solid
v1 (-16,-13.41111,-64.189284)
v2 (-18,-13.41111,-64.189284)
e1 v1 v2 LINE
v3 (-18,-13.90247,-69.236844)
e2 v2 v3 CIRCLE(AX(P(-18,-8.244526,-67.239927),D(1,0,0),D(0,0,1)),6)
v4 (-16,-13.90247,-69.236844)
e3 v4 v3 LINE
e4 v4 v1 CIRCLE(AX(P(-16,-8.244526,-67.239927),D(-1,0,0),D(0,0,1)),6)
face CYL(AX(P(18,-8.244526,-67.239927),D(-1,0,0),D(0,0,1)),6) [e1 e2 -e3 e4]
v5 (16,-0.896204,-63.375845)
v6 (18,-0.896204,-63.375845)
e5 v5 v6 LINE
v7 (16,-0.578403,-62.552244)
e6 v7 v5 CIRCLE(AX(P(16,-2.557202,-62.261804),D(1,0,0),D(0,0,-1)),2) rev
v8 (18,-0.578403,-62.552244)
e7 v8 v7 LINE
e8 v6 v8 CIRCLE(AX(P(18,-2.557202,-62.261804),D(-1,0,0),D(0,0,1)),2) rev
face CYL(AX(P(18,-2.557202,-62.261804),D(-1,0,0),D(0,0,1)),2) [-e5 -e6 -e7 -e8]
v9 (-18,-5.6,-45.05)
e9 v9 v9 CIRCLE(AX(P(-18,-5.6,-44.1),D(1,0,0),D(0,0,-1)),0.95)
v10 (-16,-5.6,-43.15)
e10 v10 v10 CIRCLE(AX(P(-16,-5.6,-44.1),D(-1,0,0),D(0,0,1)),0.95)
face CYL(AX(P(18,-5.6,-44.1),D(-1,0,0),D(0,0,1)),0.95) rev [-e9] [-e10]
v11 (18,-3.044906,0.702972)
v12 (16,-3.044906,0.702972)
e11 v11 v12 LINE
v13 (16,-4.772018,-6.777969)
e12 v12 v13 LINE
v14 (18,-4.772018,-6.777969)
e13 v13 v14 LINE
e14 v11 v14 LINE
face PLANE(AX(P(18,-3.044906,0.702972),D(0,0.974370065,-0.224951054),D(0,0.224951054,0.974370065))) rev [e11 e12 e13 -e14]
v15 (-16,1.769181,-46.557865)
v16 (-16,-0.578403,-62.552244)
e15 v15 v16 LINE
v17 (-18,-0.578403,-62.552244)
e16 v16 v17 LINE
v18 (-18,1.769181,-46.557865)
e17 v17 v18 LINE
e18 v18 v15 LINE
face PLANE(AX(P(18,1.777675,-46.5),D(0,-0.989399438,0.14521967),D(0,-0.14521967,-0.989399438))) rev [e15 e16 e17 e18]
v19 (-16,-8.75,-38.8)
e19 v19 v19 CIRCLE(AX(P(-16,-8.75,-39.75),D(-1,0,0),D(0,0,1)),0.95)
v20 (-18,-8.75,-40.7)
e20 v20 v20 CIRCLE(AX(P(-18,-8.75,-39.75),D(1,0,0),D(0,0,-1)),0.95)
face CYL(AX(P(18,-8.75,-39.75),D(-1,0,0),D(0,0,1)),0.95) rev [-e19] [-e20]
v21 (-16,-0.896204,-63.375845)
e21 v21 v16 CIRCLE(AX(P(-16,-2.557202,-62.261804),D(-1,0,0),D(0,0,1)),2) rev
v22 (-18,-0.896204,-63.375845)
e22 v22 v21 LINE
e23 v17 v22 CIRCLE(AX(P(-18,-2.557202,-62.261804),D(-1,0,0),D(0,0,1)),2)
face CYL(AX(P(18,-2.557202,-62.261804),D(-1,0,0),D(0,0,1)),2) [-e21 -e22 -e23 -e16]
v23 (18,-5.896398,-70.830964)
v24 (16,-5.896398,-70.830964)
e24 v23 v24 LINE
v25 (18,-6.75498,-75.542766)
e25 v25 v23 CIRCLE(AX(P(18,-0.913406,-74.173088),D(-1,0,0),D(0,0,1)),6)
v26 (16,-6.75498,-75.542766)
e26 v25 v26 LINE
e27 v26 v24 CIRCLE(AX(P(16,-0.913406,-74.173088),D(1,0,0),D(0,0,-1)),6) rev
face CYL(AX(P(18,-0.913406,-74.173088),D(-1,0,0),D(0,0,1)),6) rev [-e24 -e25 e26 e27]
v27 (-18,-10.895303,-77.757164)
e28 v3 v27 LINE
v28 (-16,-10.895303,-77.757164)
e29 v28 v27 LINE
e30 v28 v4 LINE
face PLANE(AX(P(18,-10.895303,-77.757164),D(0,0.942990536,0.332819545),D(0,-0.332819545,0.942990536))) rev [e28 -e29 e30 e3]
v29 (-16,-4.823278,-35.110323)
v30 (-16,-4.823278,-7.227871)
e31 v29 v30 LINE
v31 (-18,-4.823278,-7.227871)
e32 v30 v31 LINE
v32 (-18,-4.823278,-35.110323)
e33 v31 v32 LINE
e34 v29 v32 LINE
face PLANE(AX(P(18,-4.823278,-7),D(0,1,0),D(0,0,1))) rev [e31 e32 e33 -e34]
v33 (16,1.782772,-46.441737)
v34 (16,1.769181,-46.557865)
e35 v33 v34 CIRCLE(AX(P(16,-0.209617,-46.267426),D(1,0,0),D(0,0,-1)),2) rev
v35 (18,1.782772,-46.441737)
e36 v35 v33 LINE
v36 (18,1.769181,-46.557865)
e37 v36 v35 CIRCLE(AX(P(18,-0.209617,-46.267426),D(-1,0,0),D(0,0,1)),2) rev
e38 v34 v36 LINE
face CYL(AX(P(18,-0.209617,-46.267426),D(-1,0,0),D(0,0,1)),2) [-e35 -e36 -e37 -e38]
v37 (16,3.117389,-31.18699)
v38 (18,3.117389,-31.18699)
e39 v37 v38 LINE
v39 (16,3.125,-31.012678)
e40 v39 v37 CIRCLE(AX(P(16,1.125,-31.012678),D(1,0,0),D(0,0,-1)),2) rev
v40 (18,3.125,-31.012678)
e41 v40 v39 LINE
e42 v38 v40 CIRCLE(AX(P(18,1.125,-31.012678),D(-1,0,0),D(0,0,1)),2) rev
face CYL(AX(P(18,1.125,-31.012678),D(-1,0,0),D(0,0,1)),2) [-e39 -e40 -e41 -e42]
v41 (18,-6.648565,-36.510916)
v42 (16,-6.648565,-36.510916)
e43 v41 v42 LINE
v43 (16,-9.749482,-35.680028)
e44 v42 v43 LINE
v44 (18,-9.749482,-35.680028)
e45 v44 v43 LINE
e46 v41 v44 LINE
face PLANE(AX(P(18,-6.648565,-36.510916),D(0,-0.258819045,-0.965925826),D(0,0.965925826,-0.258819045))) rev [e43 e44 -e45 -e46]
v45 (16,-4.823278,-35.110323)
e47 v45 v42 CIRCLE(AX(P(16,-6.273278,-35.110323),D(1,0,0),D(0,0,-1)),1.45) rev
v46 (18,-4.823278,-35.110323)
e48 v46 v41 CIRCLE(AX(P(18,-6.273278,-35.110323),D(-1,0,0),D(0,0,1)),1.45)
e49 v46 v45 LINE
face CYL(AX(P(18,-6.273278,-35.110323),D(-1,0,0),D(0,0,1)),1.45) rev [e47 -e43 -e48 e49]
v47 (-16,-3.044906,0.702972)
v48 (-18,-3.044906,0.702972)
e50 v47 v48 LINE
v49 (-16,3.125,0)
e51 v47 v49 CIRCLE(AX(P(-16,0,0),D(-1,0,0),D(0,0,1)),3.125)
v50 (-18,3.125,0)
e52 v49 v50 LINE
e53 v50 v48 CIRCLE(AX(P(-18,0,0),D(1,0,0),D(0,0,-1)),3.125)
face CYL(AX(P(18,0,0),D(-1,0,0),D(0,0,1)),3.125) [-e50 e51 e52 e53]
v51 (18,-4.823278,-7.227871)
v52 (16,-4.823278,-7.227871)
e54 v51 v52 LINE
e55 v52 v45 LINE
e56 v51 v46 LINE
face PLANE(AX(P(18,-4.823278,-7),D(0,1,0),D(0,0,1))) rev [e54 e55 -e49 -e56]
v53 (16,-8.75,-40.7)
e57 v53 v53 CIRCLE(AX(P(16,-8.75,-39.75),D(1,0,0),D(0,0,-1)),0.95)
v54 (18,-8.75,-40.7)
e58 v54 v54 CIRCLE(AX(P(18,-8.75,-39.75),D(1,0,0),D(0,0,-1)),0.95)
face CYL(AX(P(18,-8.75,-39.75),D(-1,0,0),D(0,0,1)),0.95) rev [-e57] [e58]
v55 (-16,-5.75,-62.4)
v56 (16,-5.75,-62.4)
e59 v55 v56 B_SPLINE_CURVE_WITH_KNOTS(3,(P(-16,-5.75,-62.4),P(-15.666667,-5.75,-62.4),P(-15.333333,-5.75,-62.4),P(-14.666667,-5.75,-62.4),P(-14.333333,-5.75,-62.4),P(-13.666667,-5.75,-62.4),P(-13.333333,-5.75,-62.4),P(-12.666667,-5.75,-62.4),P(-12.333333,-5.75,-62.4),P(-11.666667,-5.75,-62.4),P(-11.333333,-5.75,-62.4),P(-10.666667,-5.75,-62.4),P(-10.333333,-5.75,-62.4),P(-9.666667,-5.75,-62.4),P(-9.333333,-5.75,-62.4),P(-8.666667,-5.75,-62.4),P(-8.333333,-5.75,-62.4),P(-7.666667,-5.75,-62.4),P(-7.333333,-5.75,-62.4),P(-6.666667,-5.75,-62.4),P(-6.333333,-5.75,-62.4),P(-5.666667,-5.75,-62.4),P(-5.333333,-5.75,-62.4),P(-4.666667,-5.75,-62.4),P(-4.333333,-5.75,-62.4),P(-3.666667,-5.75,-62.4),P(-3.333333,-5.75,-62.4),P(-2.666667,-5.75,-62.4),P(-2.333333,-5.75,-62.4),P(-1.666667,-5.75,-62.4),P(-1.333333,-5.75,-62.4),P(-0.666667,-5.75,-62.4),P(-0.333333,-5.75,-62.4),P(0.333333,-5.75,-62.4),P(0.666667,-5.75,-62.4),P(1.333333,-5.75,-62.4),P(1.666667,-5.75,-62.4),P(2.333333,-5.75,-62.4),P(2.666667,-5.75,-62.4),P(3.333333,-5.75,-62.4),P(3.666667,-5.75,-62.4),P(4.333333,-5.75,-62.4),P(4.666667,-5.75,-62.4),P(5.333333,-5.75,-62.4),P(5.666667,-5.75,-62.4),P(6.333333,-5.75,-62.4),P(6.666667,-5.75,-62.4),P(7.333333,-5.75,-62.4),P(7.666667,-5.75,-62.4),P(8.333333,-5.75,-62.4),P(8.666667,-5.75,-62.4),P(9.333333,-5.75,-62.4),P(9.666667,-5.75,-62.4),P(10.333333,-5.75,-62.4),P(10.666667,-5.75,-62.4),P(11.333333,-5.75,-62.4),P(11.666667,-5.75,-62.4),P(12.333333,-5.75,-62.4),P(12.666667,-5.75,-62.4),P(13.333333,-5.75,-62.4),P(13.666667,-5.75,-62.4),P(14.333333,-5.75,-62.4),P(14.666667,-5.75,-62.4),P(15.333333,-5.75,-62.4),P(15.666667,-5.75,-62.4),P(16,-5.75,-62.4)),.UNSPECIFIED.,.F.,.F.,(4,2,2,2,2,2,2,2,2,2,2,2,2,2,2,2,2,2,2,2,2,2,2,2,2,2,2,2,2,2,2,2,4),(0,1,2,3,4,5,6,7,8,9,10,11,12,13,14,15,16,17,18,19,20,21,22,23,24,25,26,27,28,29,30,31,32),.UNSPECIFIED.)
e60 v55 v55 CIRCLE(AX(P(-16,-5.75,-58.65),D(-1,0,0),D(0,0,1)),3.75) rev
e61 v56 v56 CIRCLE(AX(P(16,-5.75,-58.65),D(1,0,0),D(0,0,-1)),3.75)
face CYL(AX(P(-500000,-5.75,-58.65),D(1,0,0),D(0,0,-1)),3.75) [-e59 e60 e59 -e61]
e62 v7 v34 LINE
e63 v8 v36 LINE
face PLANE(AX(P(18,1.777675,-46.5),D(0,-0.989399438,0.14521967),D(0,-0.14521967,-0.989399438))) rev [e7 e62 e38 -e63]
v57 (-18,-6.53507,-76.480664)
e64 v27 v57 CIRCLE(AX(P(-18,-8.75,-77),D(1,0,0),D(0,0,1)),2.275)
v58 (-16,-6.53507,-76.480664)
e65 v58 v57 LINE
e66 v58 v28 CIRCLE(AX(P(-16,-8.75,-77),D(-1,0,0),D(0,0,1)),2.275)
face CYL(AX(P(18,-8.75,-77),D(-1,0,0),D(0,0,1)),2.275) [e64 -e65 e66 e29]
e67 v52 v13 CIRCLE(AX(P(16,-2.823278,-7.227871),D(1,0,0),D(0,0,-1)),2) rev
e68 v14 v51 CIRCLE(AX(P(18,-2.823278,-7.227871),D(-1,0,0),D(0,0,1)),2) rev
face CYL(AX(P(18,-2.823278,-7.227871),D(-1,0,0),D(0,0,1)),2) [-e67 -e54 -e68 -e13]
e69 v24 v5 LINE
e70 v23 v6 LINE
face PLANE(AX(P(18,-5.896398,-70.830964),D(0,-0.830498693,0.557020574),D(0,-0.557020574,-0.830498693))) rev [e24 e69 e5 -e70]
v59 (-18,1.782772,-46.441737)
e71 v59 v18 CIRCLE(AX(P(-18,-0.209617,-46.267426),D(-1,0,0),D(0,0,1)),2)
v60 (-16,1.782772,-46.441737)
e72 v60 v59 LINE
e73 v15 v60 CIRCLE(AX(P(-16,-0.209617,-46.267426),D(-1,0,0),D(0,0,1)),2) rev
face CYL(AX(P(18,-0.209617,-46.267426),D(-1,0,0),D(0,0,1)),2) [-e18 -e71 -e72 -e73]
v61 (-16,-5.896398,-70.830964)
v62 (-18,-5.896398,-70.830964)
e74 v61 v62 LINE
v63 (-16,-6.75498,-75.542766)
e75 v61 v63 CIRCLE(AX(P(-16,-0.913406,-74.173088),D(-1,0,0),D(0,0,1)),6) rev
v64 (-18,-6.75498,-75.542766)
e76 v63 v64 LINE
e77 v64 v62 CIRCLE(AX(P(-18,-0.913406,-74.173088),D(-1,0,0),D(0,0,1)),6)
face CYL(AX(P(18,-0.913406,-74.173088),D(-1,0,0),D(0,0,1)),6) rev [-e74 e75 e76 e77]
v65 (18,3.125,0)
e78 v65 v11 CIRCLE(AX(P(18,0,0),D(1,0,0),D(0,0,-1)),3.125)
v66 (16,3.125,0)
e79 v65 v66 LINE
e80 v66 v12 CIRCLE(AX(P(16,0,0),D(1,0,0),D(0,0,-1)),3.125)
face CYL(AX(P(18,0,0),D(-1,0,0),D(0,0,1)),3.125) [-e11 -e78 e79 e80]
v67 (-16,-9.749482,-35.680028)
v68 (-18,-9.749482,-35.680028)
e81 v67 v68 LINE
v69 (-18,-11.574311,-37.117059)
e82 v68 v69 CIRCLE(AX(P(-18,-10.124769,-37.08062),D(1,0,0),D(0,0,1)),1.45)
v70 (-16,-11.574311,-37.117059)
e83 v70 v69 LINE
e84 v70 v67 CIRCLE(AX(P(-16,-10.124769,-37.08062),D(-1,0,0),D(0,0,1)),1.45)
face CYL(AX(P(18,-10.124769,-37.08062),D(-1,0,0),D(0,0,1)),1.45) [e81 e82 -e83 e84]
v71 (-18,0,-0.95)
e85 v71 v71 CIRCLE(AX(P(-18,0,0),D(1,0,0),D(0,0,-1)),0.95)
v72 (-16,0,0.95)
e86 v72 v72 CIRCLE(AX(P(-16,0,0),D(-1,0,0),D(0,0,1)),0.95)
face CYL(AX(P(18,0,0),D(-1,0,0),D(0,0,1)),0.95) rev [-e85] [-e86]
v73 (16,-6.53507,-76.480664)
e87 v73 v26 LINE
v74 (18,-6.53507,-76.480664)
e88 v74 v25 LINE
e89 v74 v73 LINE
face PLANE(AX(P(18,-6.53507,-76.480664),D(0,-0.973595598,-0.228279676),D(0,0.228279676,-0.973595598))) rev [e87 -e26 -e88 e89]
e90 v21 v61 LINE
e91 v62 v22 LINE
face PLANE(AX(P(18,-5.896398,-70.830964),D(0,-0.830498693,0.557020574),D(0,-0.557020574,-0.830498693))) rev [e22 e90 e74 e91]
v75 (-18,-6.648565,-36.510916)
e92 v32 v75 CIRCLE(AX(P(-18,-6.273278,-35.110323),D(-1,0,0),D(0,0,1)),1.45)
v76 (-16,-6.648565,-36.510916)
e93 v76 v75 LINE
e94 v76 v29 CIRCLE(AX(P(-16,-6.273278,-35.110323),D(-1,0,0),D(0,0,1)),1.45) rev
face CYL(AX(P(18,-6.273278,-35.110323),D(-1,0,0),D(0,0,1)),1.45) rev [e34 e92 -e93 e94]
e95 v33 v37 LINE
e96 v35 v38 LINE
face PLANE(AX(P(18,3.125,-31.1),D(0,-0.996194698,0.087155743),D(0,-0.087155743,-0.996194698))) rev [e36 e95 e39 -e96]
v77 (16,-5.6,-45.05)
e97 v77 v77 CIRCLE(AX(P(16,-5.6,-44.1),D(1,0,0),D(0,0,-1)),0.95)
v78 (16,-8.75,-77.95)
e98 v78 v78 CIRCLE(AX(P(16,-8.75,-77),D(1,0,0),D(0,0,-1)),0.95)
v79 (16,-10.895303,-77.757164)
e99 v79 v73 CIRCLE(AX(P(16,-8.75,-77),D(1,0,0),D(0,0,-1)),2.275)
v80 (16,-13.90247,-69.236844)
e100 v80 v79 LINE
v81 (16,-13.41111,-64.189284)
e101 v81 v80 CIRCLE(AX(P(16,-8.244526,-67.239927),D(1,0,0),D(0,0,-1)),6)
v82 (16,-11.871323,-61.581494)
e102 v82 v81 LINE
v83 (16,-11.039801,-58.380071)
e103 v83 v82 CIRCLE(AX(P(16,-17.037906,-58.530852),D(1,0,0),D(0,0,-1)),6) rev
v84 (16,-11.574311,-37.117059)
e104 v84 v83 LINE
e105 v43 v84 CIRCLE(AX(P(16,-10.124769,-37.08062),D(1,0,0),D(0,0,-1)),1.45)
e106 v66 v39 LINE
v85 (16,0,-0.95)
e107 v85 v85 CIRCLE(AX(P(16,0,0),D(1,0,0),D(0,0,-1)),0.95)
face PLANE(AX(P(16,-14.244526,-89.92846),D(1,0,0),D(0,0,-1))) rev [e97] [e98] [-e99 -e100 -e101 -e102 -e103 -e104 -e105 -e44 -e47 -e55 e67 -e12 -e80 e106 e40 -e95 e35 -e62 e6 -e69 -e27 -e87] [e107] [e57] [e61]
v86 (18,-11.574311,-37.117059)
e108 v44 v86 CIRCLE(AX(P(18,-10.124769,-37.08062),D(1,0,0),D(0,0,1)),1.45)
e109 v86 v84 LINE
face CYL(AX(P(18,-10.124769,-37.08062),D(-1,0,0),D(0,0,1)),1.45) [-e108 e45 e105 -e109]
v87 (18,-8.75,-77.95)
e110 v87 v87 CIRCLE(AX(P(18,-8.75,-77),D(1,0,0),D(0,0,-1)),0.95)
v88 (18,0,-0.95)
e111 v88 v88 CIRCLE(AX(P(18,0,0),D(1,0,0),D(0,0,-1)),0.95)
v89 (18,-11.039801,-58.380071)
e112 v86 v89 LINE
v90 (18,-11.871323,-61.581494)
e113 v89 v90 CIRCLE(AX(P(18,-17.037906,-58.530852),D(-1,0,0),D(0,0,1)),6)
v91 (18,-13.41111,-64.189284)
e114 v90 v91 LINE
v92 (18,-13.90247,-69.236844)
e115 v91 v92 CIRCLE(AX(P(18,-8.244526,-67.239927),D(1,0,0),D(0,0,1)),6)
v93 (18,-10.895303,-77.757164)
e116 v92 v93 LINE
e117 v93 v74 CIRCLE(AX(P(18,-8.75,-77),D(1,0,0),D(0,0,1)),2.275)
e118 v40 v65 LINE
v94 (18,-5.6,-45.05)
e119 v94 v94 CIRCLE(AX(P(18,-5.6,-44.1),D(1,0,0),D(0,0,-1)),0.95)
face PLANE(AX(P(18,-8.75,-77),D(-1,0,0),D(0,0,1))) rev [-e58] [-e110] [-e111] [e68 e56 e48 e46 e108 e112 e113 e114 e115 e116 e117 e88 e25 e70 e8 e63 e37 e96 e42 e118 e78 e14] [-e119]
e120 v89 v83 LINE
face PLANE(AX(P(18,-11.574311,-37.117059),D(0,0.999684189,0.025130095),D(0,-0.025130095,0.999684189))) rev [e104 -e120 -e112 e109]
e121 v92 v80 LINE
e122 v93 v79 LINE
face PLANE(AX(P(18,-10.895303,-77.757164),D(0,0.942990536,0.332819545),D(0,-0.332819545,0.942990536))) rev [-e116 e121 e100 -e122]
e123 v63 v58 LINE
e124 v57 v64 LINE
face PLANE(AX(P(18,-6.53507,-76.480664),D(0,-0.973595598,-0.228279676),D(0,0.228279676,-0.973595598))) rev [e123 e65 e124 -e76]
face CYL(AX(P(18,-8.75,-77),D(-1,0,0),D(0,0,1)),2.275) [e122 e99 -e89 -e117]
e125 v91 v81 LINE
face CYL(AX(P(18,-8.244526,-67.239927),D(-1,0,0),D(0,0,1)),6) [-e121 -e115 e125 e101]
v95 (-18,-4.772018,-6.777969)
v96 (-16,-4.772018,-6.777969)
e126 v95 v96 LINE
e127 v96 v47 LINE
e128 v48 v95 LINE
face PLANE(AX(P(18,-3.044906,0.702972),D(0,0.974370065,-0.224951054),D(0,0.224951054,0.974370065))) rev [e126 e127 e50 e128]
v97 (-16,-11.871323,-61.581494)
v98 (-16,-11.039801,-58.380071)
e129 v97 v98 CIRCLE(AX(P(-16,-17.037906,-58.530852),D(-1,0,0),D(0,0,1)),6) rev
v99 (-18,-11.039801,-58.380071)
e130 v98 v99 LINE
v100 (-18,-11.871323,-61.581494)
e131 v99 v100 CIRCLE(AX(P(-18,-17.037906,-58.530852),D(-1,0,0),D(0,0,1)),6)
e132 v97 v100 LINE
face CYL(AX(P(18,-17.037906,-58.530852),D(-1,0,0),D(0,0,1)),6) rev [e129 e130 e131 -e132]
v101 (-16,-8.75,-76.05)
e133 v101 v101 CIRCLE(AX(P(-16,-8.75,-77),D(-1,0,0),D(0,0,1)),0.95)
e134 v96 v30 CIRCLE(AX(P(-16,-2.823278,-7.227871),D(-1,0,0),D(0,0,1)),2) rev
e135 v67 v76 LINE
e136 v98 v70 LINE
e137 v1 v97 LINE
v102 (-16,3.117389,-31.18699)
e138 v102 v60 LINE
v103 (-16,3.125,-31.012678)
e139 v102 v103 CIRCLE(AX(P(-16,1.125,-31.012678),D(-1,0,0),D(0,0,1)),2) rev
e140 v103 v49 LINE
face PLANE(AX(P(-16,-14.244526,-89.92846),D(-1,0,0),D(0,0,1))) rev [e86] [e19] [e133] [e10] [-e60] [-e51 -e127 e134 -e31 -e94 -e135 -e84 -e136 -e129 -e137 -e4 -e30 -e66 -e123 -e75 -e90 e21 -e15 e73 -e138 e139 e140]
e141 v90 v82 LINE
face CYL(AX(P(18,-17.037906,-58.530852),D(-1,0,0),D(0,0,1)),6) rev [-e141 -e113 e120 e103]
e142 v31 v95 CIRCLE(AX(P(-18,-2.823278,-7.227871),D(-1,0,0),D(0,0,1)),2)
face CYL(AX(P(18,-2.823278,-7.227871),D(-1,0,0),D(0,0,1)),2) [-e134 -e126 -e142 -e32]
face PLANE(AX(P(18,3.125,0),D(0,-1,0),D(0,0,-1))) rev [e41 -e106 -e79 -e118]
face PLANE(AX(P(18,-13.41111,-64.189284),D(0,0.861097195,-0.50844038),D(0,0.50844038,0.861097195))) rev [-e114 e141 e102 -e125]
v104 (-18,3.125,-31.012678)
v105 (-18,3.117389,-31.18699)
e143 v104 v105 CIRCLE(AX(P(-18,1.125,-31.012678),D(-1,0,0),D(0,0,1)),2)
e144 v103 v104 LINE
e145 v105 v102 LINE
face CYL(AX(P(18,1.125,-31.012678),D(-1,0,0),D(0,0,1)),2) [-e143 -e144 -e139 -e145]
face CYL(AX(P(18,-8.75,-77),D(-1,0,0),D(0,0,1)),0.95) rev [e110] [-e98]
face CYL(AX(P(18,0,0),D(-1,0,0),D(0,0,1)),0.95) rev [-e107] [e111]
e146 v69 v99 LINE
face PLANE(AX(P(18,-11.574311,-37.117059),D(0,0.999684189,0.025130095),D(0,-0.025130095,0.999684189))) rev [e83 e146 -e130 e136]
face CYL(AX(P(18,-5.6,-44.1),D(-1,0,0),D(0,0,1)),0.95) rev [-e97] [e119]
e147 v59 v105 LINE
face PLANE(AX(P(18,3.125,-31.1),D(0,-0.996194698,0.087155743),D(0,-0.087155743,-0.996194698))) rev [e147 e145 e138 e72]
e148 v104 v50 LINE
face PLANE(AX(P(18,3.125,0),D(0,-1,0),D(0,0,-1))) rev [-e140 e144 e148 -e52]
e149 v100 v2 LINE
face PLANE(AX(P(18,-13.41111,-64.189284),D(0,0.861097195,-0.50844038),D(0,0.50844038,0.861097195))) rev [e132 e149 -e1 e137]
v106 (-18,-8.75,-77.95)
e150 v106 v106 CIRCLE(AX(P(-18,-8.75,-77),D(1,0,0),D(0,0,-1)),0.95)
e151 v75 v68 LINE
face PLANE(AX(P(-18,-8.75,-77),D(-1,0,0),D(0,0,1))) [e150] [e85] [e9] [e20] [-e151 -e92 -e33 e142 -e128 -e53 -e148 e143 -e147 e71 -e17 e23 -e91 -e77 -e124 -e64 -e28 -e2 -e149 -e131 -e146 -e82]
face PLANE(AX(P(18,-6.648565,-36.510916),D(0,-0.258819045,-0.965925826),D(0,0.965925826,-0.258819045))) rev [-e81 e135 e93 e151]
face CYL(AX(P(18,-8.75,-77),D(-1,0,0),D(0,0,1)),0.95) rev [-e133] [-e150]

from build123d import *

# Parameters (mm, degrees)
SKETCH1_R                = 0.95
BOSS_EXTRUDE1_DEPTH      = 18
FILLET1_R                = 2
CUT_EXTRUDE1_DEPTH       = 83.531401045
CUT_EXTRUDE1_DEPTH_BACK  = 83.531401045
SKETCH2_W                = 32
SKETCH2_H                = 101.957647254
BOSS_EXTRUDE2_DEPTH      = 16
BOSS_EXTRUDE2_DEPTH_BACK = 18
SKETCH3_R                = 3.75


with BuildPart() as part:
    # Sketch1 → Boss-Extrude1 (new, symmetric)
    with BuildSketch(Plane(origin=(0, 0, 0), x_dir=(0, 0, -1), z_dir=(1, 0, 0))):
        with BuildLine():
            Line((0, 3.125), (31.1, 3.125))
            Line((31.1, 3.125), (46.5, 1.777674582))
            Line((46.5, 1.777674582), (63, -0.644122384))
            Line((63, -0.644122384), (70.830964262, -5.89639821))
            ThreePointArc((70.830964262, -5.89639821), (73.097482893, -6.816208289), (75.542765767, -6.754979641))
            Line((75.542765767, -6.754979641), (76.480663736, -6.535070013))
            ThreePointArc((76.480663736, -6.535070013), (79.183357394, -8.1108009), (77.757164464, -10.895303469))
            Line((77.757164464, -10.895303469), (69.23684377, -13.902469654))
            ThreePointArc((69.23684377, -13.902469654), (66.658598046, -14.216298138), (64.18928422, -13.41110961))
            Line((64.18928422, -13.41110961), (61.581493884, -11.871323024))
            ThreePointArc((61.581493884, -11.871323024), (60.039213852, -11.230596721), (58.380071029, -11.039801059))
            Line((58.380071029, -11.039801059), (37.117058695, -11.574311392))
            ThreePointArc((37.117058695, -11.574311392), (35.941440636, -11.021859195), (35.680027609, -9.749481703))
            Line((35.680027609, -9.749481703), (36.510915657, -6.64856529))
            ThreePointArc((36.510915657, -6.64856529), (36.260685553, -5.390573603), (35.110323209, -4.823277675))
            Line((35.110323209, -4.823277675), (7, -4.823277675))
            Line((7, -4.823277675), (-0.702972045, -3.044906452))
            ThreePointArc((-0.702972045, -3.044906452), (-3.104912049, 0.353760043), (0, 3.125))
        make_face()
        Circle(SKETCH1_R, mode=Mode.SUBTRACT)
        with Locations((77, -8.75)):
            Circle(SKETCH1_R, mode=Mode.SUBTRACT)
        with Locations((39.75, -8.75)):
            Circle(SKETCH1_R, mode=Mode.SUBTRACT)
        with Locations((44.1, -5.6)):
            Circle(SKETCH1_R, mode=Mode.SUBTRACT)
    extrude(amount=BOSS_EXTRUDE1_DEPTH, both=True)

    # Fillet1
    # the kernel refuses this fillet: 2 mm, written as the material it takes off along each edge
    with BuildSketch(Plane(origin=(18.569678042, -4.823277675, -7), x_dir=(0, 0, -1), z_dir=(-1, 0, 0))) as fillet1_piece_1:
        with BuildLine():
            CenterArc((FILLET1_R * 0.113935608302, -FILLET1_R), FILLET1_R, 90, 13)
            Line((-FILLET1_R * 0.111015446042, -FILLET1_R * 0.0256299352148), (0, 0))
            Line((0, 0), (FILLET1_R * 0.113935608302, 0))
        make_face()
    extrude(amount=37.139356083, mode=Mode.SUBTRACT)
    with BuildSketch(Plane(origin=(18.218304715, 3.125, -31.1), x_dir=(0, -0.08715574274766148, -0.9961946980917452), z_dir=(-1, 0, 0))) as fillet1_piece_2:
        with BuildLine():
            CenterArc((FILLET1_R * 0.0436609429085, FILLET1_R), FILLET1_R, 265, 5)
            Line((-FILLET1_R * 0.0434947998391, FILLET1_R * 0.00380530190825), (0, 0))
            Line((0, 0), (FILLET1_R * 0.0436609429085, 0))
        make_face()
    extrude(amount=36.436609429, mode=Mode.SUBTRACT)
    with BuildSketch(Plane(origin=(18.14621298, 1.777674582, -46.5), x_dir=(0, -0.1452196700772367, -0.9893994377513354), z_dir=(-1, 0, 0))) as fillet1_piece_3:
        with BuildLine():
            CenterArc((FILLET1_R * 0.0292425960983, FILLET1_R), FILLET1_R, 266.65, 3.35)
            Line((-FILLET1_R * 0.02919262642, FILLET1_R * 0.00170879761001), (0, 0))
            Line((0, 0), (FILLET1_R * 0.0292425960983, 0))
        make_face()
    extrude(amount=36.292425961, mode=Mode.SUBTRACT)
    with BuildSketch(Plane(origin=(19.131384491, -0.644122384, -63), x_dir=(0, -0.5570205743376945, -0.8304986934152907), z_dir=(-1, 0, 0))) as fillet1_piece_4:
        with BuildLine():
            CenterArc((FILLET1_R * 0.226276898255, FILLET1_R), FILLET1_R, 244.5, 25.5)
            Line((-FILLET1_R * 0.204234198553, FILLET1_R * 0.0974147156501), (0, 0))
            Line((0, 0), (FILLET1_R * 0.226276898255, 0))
        make_face()
    extrude(amount=38.262768983, mode=Mode.SUBTRACT)

    # Sketch2 → Cut-Extrude1 (cut, two sides: drawn at the far end of the back side and taken through both)
    with BuildSketch(Plane(origin=(0, 0, 0), x_dir=(1, 0, 0), z_dir=(0, 1, 0)).offset(-CUT_EXTRUDE1_DEPTH_BACK)):
        with Locations((0, 38.94963668)):
            Rectangle(SKETCH2_W, SKETCH2_H)
    extrude(amount=CUT_EXTRUDE1_DEPTH + CUT_EXTRUDE1_DEPTH_BACK, mode=Mode.SUBTRACT)


with BuildPart() as cut_extrude1_piece_1:
    # of the separate pieces the step leaves, piece 1, a body of its own (cut_extrude1_pieces)
    add(part.part.solids().sort_by_distance((-18, -4.823277675, -35.110323209))[0])



with BuildPart() as cut_extrude1_piece_2:
    # of the separate pieces the step leaves, piece 2, a body of its own (cut_extrude1_pieces)
    add(part.part.solids().sort_by_distance((16, -4.823277675, -35.110323209))[0])


with BuildPart() as cut_extrude1_piece_1_1:
    add(cut_extrude1_piece_1.part)

    add(cut_extrude1_piece_2.part)  # Boss-Extrude2 merges Cut-Extrude1 piece 2
    # Sketch3 → Boss-Extrude2 (add, two sides: drawn at the far end of the back side and taken through both)
    with BuildSketch(Plane(origin=(0, 0, 0), x_dir=(0, 0, -1), z_dir=(1, 0, 0)).offset(-BOSS_EXTRUDE2_DEPTH_BACK)):
        with Locations((58.65, -5.75)):
            Circle(SKETCH3_R)
    extrude(amount=BOSS_EXTRUDE2_DEPTH + BOSS_EXTRUDE2_DEPTH_BACK)


solid = cut_extrude1_piece_1_1.part
